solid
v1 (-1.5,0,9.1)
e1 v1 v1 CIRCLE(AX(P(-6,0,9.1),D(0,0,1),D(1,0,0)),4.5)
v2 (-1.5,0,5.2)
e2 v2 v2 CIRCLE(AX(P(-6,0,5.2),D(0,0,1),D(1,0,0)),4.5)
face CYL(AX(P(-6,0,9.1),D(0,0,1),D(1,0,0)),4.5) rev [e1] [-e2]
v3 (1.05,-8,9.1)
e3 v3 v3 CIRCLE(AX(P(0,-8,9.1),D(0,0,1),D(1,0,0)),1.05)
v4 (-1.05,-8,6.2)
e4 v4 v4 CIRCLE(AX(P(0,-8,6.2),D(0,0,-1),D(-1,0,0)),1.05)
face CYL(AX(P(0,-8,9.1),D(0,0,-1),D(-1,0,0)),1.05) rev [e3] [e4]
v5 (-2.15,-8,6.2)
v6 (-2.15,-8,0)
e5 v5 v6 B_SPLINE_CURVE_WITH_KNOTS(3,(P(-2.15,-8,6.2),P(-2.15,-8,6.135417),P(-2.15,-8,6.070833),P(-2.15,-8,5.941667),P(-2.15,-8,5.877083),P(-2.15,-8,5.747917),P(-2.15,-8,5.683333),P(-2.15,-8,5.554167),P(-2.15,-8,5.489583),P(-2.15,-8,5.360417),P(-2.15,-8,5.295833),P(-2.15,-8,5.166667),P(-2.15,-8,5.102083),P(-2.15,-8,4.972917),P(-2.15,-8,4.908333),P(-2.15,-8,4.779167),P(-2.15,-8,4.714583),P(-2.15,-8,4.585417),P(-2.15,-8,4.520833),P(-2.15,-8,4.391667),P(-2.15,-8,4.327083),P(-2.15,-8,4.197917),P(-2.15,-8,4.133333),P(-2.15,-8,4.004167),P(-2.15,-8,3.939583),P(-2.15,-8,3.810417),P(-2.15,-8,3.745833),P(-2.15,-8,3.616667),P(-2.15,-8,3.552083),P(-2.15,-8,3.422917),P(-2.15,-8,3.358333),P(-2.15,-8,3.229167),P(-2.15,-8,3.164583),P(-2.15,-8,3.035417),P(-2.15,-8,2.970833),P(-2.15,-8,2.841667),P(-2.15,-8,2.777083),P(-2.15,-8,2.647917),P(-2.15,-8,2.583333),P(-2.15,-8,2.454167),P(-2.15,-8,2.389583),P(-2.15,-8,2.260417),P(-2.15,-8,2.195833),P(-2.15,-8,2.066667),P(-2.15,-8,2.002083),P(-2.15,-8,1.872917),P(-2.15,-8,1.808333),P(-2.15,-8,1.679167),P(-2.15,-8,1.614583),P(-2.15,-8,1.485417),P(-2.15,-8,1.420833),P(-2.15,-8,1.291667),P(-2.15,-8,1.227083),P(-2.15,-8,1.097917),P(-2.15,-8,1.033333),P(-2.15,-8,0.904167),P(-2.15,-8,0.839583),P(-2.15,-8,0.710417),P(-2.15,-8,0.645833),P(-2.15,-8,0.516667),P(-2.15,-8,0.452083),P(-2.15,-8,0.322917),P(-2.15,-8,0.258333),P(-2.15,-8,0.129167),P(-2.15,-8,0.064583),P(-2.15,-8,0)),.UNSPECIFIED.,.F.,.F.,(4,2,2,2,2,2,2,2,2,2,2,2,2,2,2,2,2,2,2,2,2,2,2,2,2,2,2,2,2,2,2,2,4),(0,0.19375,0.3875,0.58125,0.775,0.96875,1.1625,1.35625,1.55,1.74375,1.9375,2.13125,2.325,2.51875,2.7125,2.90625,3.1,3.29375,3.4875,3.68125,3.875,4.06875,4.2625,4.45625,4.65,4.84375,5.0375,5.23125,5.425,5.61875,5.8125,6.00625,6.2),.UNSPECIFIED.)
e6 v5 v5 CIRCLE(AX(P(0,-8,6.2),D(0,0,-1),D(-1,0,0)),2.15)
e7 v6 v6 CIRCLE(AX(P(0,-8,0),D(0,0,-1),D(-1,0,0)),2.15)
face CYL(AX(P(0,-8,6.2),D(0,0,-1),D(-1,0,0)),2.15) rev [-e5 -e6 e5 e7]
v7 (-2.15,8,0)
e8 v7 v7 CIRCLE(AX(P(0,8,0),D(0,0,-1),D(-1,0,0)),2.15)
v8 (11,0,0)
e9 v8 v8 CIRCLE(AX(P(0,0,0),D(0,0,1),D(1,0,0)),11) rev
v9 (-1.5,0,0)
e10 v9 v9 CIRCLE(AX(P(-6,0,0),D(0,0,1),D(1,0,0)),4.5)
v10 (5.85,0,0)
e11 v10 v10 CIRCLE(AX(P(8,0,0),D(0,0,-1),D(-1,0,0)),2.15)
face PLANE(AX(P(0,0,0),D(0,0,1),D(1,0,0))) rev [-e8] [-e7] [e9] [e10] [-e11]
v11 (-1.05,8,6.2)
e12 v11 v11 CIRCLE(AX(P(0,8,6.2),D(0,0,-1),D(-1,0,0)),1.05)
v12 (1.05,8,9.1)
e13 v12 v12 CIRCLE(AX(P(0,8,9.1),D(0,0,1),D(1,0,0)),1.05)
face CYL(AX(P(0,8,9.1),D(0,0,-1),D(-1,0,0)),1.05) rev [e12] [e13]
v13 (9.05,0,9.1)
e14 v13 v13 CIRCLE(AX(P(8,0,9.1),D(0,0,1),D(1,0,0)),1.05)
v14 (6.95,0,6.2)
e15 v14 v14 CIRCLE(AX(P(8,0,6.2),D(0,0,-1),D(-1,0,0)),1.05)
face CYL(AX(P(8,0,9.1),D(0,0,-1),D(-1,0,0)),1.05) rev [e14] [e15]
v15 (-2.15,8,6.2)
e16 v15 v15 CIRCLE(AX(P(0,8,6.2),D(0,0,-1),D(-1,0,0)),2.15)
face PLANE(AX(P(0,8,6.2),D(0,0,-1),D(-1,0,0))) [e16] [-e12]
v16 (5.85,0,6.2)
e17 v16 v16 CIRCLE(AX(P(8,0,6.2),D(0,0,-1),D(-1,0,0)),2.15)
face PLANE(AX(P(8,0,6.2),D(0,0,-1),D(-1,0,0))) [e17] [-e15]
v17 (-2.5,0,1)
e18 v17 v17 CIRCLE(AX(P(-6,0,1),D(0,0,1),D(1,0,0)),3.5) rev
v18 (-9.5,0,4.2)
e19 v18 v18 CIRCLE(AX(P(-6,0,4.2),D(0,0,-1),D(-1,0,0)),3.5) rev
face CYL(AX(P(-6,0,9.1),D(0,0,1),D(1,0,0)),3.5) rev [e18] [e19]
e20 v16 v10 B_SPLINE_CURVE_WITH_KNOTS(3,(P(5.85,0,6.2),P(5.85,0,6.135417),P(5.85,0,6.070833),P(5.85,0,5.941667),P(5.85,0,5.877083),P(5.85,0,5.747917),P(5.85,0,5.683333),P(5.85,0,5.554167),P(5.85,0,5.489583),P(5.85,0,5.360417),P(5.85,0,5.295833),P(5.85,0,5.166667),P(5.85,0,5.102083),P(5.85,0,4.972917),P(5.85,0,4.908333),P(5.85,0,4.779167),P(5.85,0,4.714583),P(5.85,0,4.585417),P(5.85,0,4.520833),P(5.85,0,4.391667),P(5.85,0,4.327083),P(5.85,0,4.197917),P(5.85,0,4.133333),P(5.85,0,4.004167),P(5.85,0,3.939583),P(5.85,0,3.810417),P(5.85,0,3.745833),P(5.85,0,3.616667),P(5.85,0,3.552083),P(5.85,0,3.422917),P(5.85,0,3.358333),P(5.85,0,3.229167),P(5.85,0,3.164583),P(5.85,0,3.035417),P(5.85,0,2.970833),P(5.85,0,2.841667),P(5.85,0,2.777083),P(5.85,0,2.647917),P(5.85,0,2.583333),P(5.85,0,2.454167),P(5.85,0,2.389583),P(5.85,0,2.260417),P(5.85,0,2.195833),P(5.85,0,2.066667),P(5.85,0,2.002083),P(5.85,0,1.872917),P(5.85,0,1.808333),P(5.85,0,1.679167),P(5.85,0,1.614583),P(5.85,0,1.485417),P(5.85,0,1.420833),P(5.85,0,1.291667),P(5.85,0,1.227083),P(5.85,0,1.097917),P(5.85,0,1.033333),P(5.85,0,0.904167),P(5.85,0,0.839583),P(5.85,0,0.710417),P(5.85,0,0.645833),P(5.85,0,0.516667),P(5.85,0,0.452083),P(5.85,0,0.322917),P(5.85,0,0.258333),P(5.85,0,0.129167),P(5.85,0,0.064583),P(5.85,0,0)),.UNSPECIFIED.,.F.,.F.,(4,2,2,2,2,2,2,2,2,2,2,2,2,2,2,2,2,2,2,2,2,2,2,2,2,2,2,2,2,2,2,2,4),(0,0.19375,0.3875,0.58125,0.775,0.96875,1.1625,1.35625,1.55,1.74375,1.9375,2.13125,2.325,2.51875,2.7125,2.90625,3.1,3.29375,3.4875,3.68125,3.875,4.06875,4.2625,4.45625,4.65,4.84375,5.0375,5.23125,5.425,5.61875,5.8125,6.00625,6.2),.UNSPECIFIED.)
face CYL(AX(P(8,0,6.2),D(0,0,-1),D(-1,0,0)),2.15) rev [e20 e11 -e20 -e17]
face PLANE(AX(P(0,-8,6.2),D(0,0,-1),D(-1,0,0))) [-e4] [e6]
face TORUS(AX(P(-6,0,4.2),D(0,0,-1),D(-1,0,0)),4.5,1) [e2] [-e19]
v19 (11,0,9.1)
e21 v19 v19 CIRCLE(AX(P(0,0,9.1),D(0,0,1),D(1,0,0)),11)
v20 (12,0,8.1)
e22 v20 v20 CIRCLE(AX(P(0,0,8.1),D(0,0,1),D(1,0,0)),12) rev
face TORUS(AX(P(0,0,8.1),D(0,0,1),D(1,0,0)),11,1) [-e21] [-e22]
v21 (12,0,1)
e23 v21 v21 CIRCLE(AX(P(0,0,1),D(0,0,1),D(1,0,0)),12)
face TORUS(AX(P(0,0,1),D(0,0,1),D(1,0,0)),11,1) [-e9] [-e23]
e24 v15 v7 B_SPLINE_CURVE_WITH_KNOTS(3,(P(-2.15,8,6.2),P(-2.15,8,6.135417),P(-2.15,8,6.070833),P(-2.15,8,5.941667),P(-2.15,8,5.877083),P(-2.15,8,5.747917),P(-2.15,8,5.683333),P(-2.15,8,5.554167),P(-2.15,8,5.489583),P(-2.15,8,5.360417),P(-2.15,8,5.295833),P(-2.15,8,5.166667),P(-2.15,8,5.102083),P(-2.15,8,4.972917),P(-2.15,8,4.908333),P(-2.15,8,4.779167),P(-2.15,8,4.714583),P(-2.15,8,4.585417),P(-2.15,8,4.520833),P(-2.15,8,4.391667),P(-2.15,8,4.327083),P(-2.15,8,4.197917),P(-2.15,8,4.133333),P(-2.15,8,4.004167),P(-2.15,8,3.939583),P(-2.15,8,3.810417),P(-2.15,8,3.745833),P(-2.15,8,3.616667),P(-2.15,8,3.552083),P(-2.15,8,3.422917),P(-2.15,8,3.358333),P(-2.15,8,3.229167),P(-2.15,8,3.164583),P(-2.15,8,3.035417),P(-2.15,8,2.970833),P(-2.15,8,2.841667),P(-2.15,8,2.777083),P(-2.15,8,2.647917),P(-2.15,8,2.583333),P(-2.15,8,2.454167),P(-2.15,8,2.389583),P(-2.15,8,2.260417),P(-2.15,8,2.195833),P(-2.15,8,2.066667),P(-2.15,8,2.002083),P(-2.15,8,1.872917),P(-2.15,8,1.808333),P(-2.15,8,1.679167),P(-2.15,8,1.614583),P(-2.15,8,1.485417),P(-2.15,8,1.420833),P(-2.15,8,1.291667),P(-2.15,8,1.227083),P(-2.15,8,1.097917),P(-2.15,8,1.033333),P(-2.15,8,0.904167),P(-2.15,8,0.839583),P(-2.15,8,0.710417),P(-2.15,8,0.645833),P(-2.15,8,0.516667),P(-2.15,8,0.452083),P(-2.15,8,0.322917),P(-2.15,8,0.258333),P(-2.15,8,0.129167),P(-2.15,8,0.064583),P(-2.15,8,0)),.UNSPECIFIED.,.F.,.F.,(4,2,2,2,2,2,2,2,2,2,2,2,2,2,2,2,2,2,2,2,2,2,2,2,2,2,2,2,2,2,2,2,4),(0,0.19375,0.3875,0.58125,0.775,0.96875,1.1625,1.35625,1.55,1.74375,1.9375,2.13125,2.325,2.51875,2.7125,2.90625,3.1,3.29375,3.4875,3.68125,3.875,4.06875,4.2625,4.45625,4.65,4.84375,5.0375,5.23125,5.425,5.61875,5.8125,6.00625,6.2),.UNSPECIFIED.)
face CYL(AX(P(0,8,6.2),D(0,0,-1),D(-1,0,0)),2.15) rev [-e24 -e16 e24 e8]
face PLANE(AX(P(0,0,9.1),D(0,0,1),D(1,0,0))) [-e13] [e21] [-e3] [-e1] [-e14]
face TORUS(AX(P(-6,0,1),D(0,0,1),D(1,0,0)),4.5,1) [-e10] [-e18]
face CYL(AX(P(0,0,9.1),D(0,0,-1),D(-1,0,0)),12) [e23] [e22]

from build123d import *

# Parameters (mm, degrees)
SKETCH1_R           = 12
SKETCH1_R_2         = 1.05
BOSS_EXTRUDE1_DEPTH = 9.1
HOLE2_D             = 7
HOLE2_DEPTH         = 12
HOLE2_CBORE_D       = 9
HOLE2_CBORE_DEPTH   = 3.9
SKETCH8_R           = 2.15
CUT_EXTRUDE1_DEPTH  = 6.2
FILLET1_R           = 1


with BuildPart() as part:
    # Sketch1 → Boss-Extrude1 (new body)
    with BuildSketch(Plane.XY):
        Circle(SKETCH1_R)
        with Locations((0, 8)):
            Circle(SKETCH1_R_2, mode=Mode.SUBTRACT)
        with Locations((8, 0)):
            Circle(SKETCH1_R_2, mode=Mode.SUBTRACT)
        with Locations((0, -8)):
            Circle(SKETCH1_R_2, mode=Mode.SUBTRACT)
    extrude(amount=BOSS_EXTRUDE1_DEPTH)

    # Hole2
    with Locations(Plane.XY.offset(9.1)):
        with Locations((-6, 0)):
            CounterBoreHole(HOLE2_D / 2, HOLE2_CBORE_D / 2, HOLE2_CBORE_DEPTH, depth=HOLE2_DEPTH)

    # Sketch8 → Cut-Extrude1 (cut)
    with BuildSketch(Plane(origin=(0, 0, 0), x_dir=(-1, 0, 0), z_dir=(0, 0, -1))):
        with Locations((0, 8)):
            Circle(SKETCH8_R)
        with Locations((0, -8)):
            Circle(SKETCH8_R)
        with Locations((-8, 0)):
            Circle(SKETCH8_R)
    extrude(amount=-CUT_EXTRUDE1_DEPTH, mode=Mode.SUBTRACT)

    # Fillet1
    fillet1_edges = [part.edges().sort_by_distance(p)[0] for p in [
        (-12, 0, 0),
        (-2.5, 0, 0),
        (-2.5, 0, 5.2),
        (-12, 0, 9.1),
    ]]
    fillet(fillet1_edges, radius=FILLET1_R - 0.0001)  # a hair under: the kernel refuses the full size


solid = part.part
